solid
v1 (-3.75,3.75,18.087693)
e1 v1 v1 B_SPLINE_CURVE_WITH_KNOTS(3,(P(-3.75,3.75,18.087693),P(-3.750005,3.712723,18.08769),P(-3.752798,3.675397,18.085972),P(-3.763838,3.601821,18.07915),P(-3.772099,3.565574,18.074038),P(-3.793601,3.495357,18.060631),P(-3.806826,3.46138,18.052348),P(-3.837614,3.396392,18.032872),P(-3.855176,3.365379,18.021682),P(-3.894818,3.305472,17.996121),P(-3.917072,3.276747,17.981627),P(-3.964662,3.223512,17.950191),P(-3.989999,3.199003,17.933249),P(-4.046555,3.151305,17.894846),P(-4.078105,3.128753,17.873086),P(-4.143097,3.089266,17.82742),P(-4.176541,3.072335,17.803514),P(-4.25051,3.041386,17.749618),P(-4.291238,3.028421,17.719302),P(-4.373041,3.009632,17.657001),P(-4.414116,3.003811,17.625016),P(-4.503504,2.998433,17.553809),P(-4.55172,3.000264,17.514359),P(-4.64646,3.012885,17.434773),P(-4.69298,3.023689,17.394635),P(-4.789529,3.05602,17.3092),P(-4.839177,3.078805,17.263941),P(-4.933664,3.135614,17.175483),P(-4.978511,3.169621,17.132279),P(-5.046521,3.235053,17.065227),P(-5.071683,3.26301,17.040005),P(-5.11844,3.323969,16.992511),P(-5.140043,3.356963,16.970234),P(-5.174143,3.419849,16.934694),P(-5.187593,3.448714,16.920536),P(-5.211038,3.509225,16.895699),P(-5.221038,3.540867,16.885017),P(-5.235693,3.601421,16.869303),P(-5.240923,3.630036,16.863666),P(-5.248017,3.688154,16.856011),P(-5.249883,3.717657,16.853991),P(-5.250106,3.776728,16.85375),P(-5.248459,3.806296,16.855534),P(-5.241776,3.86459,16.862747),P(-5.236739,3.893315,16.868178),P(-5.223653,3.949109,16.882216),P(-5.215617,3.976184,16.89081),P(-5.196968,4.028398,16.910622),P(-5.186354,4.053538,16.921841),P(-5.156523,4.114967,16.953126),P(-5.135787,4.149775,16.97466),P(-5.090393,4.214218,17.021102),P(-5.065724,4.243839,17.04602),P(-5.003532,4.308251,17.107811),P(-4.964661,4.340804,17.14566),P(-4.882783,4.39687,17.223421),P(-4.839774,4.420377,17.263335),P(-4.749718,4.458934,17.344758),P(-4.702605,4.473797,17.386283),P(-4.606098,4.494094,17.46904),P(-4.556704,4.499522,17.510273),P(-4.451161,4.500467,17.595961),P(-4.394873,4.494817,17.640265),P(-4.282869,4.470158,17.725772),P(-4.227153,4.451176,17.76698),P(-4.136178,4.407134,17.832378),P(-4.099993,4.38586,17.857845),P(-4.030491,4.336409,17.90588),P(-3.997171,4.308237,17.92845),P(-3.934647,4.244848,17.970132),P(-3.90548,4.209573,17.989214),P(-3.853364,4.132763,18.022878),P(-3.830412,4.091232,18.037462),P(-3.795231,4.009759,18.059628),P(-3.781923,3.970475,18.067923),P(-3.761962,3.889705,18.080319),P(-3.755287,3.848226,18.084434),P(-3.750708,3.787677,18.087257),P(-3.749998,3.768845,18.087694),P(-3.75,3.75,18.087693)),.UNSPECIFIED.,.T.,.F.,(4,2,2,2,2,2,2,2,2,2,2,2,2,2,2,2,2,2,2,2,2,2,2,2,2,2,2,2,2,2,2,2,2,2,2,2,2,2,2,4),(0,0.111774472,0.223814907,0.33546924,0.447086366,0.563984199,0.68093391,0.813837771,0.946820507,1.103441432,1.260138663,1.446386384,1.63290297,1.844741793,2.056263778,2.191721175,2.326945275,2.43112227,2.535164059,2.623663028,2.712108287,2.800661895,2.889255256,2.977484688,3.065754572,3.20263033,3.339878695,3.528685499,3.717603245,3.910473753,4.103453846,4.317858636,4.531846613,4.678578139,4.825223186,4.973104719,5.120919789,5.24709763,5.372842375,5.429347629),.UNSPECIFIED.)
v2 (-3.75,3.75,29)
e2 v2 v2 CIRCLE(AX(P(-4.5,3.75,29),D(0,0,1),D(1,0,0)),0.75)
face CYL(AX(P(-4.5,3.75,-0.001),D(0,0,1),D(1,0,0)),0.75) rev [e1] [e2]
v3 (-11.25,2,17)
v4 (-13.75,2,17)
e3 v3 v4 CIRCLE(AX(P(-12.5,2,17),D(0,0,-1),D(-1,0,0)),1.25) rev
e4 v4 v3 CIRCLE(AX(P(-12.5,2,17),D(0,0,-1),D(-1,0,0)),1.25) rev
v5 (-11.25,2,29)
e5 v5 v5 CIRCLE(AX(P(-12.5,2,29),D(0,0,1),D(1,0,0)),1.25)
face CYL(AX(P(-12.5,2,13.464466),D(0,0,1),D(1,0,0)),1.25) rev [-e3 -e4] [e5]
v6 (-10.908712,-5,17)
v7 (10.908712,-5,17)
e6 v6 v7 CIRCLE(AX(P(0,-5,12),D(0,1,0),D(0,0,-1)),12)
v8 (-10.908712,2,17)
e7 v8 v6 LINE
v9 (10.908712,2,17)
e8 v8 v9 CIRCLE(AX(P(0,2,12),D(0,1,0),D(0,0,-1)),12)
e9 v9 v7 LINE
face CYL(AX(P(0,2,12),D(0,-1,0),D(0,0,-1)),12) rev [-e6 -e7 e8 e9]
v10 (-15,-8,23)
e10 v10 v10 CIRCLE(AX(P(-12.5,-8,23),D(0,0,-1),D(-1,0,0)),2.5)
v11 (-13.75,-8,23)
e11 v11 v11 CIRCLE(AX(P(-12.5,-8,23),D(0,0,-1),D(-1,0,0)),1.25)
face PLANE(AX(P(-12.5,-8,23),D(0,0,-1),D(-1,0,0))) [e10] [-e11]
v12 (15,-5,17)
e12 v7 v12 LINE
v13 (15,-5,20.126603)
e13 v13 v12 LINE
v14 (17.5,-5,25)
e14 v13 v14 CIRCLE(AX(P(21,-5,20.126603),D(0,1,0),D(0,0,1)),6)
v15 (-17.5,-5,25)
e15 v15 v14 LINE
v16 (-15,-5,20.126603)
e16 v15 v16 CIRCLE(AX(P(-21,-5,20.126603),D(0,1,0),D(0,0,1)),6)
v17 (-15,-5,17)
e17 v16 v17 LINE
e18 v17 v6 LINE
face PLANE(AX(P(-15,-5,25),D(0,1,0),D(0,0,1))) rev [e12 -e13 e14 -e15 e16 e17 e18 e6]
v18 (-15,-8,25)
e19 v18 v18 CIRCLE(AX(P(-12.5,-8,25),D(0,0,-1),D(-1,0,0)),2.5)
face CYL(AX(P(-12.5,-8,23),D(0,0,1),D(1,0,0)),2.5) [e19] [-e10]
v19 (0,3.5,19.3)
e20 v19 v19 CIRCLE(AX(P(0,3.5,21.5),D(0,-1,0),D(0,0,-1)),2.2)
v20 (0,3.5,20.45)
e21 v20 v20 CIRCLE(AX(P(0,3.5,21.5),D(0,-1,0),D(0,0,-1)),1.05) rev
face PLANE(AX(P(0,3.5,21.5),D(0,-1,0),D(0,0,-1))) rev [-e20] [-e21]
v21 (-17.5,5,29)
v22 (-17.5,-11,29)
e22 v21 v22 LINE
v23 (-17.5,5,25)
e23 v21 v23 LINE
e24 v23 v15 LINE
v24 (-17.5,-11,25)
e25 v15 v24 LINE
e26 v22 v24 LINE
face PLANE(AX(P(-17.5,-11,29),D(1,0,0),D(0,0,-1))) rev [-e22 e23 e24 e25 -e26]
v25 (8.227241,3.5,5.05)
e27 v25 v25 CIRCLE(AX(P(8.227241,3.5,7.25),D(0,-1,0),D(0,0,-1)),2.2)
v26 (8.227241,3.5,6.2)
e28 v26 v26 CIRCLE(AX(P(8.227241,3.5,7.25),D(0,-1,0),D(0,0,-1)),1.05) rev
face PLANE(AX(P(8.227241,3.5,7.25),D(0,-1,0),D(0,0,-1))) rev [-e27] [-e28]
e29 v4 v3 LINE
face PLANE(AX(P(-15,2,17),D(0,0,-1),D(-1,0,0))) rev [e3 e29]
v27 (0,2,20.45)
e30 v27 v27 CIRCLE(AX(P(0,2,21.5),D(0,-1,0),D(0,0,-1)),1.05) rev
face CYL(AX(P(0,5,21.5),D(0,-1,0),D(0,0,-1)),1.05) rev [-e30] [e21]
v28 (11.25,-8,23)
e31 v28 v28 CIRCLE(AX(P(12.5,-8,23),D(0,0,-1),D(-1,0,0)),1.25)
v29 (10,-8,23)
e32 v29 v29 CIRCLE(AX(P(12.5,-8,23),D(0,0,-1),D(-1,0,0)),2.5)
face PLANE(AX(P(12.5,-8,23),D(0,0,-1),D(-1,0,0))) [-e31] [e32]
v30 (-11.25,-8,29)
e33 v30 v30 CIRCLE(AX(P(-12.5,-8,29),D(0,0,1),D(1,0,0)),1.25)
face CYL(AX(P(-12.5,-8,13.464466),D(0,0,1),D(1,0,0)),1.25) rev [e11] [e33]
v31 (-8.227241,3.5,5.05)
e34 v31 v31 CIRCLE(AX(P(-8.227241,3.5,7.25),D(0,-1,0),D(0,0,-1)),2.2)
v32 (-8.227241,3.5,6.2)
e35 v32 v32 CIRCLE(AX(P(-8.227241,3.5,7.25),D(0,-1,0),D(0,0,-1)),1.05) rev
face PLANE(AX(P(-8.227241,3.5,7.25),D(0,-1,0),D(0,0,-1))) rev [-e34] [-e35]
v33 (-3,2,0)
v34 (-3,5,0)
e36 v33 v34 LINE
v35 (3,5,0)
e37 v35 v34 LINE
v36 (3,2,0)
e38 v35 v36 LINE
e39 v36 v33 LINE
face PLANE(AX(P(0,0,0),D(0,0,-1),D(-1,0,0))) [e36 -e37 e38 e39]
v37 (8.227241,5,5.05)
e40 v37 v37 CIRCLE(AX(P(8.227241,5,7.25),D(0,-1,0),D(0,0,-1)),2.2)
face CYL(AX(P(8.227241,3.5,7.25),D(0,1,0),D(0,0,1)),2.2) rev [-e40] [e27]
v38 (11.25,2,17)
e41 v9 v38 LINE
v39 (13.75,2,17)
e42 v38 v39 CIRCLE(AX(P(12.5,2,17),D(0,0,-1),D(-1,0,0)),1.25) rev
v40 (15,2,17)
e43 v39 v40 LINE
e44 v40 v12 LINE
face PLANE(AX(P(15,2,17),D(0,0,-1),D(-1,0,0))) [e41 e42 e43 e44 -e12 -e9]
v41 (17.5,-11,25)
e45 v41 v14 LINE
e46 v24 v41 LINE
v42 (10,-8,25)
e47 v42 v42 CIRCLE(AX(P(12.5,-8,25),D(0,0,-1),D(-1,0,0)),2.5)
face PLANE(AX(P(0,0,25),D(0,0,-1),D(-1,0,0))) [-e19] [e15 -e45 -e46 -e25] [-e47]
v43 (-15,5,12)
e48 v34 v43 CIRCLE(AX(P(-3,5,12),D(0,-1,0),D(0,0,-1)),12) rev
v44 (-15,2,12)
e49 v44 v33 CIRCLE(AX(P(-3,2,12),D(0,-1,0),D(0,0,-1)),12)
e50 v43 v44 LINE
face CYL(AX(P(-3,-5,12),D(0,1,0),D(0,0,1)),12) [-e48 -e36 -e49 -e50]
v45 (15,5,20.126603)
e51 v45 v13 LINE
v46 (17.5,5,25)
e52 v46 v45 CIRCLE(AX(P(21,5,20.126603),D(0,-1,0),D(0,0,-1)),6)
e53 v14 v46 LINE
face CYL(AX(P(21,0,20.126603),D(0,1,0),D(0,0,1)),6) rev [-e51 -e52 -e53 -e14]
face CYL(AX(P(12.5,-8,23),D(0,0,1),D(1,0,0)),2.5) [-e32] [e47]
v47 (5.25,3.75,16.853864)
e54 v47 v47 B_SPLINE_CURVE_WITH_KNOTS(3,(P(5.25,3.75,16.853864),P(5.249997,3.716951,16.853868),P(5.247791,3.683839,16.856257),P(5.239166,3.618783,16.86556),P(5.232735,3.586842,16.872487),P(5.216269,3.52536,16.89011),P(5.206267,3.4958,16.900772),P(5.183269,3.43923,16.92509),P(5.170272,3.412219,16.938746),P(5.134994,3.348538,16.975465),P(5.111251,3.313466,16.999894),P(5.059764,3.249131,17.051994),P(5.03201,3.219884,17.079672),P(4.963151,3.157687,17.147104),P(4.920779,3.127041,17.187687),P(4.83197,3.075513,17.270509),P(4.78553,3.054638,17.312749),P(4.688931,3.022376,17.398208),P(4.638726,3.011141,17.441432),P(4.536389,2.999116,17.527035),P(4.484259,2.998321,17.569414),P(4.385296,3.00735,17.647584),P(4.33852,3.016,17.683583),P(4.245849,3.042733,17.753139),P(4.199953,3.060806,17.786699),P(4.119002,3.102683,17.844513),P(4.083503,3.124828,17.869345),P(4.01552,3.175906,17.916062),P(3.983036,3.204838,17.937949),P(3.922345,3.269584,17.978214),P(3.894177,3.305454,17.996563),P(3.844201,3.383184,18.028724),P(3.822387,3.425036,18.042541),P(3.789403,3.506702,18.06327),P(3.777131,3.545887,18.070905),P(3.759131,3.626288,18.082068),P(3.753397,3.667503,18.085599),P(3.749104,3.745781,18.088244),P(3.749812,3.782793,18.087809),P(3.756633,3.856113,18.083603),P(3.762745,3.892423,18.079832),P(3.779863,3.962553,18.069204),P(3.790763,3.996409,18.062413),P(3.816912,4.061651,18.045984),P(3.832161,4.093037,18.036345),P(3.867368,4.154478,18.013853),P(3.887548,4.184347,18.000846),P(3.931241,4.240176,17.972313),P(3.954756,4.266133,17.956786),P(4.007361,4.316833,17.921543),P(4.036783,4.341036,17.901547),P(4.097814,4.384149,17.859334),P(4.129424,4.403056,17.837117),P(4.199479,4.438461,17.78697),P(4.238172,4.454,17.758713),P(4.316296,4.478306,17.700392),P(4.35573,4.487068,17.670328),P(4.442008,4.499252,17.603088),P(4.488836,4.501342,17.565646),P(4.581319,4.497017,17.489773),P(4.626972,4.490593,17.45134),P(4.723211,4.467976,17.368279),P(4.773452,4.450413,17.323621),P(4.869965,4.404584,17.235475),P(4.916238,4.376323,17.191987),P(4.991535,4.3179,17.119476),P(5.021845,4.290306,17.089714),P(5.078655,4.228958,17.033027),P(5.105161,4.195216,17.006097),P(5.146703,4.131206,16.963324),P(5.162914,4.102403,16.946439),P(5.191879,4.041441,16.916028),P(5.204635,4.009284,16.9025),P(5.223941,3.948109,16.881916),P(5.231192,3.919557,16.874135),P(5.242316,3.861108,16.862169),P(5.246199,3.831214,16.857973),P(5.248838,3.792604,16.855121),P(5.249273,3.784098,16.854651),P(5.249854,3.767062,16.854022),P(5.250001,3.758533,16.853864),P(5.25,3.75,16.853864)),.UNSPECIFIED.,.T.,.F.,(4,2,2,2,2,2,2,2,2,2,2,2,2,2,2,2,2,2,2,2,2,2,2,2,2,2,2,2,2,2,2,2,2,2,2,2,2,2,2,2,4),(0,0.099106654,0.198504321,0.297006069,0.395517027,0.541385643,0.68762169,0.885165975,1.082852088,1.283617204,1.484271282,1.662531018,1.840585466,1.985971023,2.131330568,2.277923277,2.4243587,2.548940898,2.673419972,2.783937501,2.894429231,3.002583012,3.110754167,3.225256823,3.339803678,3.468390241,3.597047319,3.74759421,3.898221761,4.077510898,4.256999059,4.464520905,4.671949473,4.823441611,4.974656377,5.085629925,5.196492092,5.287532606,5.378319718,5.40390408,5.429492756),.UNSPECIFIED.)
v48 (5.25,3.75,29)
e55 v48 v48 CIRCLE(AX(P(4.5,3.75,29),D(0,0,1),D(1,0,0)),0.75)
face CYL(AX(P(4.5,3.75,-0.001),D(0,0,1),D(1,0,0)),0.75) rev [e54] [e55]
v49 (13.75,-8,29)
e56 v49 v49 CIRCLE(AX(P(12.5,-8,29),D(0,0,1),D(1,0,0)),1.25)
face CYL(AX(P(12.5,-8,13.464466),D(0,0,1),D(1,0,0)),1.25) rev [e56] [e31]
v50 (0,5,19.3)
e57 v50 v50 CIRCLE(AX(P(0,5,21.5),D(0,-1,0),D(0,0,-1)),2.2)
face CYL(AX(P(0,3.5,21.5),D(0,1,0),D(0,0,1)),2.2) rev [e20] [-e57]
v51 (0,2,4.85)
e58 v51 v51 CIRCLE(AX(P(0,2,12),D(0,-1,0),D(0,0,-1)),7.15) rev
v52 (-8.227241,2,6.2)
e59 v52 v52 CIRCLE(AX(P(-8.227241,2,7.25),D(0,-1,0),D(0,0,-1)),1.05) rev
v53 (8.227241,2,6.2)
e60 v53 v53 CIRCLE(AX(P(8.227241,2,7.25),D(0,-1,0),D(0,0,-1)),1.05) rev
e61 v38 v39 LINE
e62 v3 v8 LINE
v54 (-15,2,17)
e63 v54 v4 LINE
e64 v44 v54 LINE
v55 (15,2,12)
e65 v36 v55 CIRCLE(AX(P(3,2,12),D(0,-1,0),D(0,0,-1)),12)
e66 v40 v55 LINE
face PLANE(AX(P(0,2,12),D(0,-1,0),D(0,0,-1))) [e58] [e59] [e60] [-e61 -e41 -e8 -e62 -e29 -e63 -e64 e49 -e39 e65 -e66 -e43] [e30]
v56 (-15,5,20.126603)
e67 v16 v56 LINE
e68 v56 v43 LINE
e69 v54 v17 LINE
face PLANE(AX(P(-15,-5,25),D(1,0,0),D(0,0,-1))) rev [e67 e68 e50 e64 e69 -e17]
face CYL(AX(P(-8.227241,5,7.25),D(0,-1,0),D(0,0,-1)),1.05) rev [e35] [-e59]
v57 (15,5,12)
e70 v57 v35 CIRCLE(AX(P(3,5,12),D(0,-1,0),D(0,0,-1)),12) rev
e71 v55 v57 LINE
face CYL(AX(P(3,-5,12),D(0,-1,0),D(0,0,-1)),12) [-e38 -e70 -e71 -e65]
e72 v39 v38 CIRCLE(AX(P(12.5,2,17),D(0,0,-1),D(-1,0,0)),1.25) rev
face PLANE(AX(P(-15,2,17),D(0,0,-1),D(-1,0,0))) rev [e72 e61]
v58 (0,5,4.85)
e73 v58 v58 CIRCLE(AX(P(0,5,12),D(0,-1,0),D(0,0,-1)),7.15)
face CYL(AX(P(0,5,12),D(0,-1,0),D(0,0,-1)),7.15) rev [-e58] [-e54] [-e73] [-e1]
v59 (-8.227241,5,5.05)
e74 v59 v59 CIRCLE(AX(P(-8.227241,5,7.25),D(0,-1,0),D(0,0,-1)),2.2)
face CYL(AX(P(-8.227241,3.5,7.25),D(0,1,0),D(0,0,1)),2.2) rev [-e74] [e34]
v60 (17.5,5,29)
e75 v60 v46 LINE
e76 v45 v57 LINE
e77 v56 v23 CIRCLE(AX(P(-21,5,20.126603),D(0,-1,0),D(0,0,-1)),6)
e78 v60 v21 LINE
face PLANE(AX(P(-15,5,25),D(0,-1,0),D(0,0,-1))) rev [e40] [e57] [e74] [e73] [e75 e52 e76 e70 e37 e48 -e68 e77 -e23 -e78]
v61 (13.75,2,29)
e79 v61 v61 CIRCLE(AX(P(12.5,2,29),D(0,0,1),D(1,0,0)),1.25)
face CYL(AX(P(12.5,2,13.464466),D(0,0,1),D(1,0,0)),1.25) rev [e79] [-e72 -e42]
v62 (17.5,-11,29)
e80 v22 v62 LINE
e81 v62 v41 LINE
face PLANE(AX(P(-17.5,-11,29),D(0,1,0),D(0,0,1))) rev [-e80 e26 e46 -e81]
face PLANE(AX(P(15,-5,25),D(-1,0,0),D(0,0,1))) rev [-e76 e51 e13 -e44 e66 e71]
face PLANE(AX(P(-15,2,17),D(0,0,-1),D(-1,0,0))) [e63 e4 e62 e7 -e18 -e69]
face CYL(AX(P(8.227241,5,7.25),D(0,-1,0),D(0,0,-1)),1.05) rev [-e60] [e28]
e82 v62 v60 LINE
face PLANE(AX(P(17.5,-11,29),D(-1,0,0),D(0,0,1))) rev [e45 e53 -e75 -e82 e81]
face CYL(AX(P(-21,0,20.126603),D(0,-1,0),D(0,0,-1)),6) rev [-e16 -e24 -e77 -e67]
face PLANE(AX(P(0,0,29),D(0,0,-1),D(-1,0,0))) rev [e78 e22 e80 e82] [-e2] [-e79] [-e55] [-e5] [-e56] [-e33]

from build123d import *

# Parameters (mm, degrees)
SKETCH1_W                           = 30
SKETCH1_H                           = 10
MAIN_DEPTH                          = 25
SKETCH5_R                           = 1.05
SKETCH5_R_2                         = 7.15
MAINANDFIXHOLE_DEPTH                = 31.822070015
SKETCH6_R                           = 2.2
CODERFIXHOLE2_DEPTH                 = 1.5
CODERHOLE2_DEPTH                    = 7
SKETCH10_W                          = 35
SKETCH10_H                          = 16
LINK_DEPTH                          = 4
SKETCH8_R                           = 1.25
VERTICALHOLES_DEPTH                 = 12
SKETCH13_R                          = 2.5
LINKREINFORCEMENT_DEPTH             = 2
FILLET4_R                           = 6
FILLET6_R                           = 12
HOLELPATTERN1_COUNT                 = 2
HOLELPATTERN1_PITCH                 = 25
HOLELPATTERN1_COUNT_DIR2            = 2
HOLELPATTERN1_PITCH_DIR2            = 10
HOLETOACCESSENCODERSCREW_REACH      = 37.612
HOLETOACCESSENCODERSCREW_END_RADIUS = 7.15
SKETCH14_R                          = 0.75


with BuildPart() as part:
    # Sketch1 → Main (new body)
    with BuildSketch(Plane.XY):
        Rectangle(SKETCH1_W, SKETCH1_H)
    extrude(amount=MAIN_DEPTH)

    # Sketch5 → MainAndFixHole (cut, through all)
    with BuildSketch(Plane(origin=(0, -5, 0), x_dir=(-1, 0, 0), z_dir=(0, -1, 0))):
        with Locations(Location((0, -21.5, 0), (0, 0, 90))):
            Circle(SKETCH5_R)
        with Locations(Location((-8.227241336, -7.25, 0), (0, 0, 90))):
            Circle(SKETCH5_R)
        with Locations(Location((8.227241336, -7.25, 0), (0, 0, 90))):
            Circle(SKETCH5_R)
        with Locations(Location((0, -12, 0), (0, 0, 90))):
            Circle(SKETCH5_R_2)
    extrude(amount=-MAINANDFIXHOLE_DEPTH, mode=Mode.SUBTRACT)

    # Sketch6 → CoderFixHole2 (cut)
    with BuildSketch(Plane(origin=(0, 5, 0), x_dir=(-1, 0, 0), z_dir=(0, -1, 0))):
        with Locations(Location((0, -21.5, 0), (0, 0, 90))):
            Circle(SKETCH6_R)
        with Locations(Location((-8.227241336, -7.25, 0), (0, 0, 90))):
            Circle(SKETCH6_R)
        with Locations(Location((8.227241336, -7.25, 0), (0, 0, 90))):
            Circle(SKETCH6_R)
    extrude(amount=CODERFIXHOLE2_DEPTH, mode=Mode.SUBTRACT)

    # Sketch11 → CoderHole2 (cut)
    with BuildSketch(Plane(origin=(0, -5, 0), x_dir=(1, 0, 0), z_dir=(0, 1, 0))):
        with BuildLine():
            Line((-15, 0), (15, 0))
            Line((15, 0), (15, -17))
            Line((15, -17), (10.908712115, -17))
            ThreePointArc((10.908712115, -17), (0, -24), (-10.908712115, -17))
            Line((-10.908712115, -17), (-15, -17))
            Line((-15, -17), (-15, 0))
        make_face()
    extrude(amount=CODERHOLE2_DEPTH, mode=Mode.SUBTRACT)

    # Sketch10 → Link (add)
    with BuildSketch(Plane.XY.offset(25)):
        with Locations((0, -3)):
            Rectangle(SKETCH10_W, SKETCH10_H)
    extrude(amount=LINK_DEPTH)

    # Sketch8 → VerticalHoles (cut)
    with BuildSketch(Plane.XY.offset(29)):
        with Locations((12.5, 2)):
            Circle(SKETCH8_R)
    verticalholes = extrude(amount=-VERTICALHOLES_DEPTH, mode=Mode.SUBTRACT)

    # Sketch13 → LinkReinforcement (add)
    with BuildSketch(Plane(origin=(0, 0, 25), x_dir=(-1, 0, 0), z_dir=(0, 0, -1))):
        with Locations((-12.5, -8)):
            Circle(SKETCH13_R)
        with Locations((12.5, -8)):
            Circle(SKETCH13_R)
    extrude(amount=LINKREINFORCEMENT_DEPTH)

    # Fillet4
    # the kernel refuses this fillet: 6 mm, written as the material it adds along each edge
    with BuildSketch(Plane(origin=(15, -5, 25), x_dir=(1, 0, 0), z_dir=(0, 1, 0)), Plane(origin=(-15, 5, 25), x_dir=(-1, 0, 0), z_dir=(0, -1, 0))) as fillet4_piece_1:
        with BuildLine():
            CenterArc((6, 4.873397172), FILLET4_R, 180, 54.314665287)
            Line((0, 4.873397172), (-0.12, 4.873397172))
            Line((-0.12, 4.873397172), (-0.12, 0))
            Line((-0.12, 0), (0, -0.12))
            ThreePointArc((0, -0.12), (1.25, -0.12), (2.43, -0.097467943))
            Line((2.43, -0.097467943), (2.5, 0))
        make_face()
    extrude(amount=10)

    # Fillet6
    fillet6_edges = [part.edges().sort_by_distance(p)[0] for p in [
        (-15, 3.5, 0),
        (15, 3.5, 0),
    ]]
    fillet(fillet6_edges, radius=FILLET6_R)

    # HoleLPattern1: VerticalHoles 2 × 2
    with Locations(*[(-i * HOLELPATTERN1_PITCH, -j * HOLELPATTERN1_PITCH_DIR2, 0) for i in range(HOLELPATTERN1_COUNT) for j in range(HOLELPATTERN1_COUNT_DIR2) if (i, j) != (0, 0)]):
        add(verticalholes, mode=Mode.SUBTRACT)

    # HoleToAccessEncoderScrew: up to this cylinder (the profile starts outside it)
    holetoaccessencoderscrew_end = Plane(origin=(0, 3.75, 12), z_dir=(0, -1, 0)) * Cylinder(HOLETOACCESSENCODERSCREW_END_RADIUS, 90.524, mode=Mode.PRIVATE)
    # Sketch14 → HoleToAccessEncoderScrew (cut, up to the surface)
    with BuildSketch(Plane.XY.offset(29), mode=Mode.PRIVATE) as holetoaccessencoderscrew_sk1:
        with Locations((4.5, 3.75)):
            Circle(SKETCH14_R)
    holetoaccessencoderscrew_tool1 = extrude(holetoaccessencoderscrew_sk1.sketch, amount=-HOLETOACCESSENCODERSCREW_REACH, mode=Mode.PRIVATE) - holetoaccessencoderscrew_end
    add(holetoaccessencoderscrew_tool1.solids().sort_by_distance((4.5, 3.75, 29))[0], mode=Mode.SUBTRACT)
    # Sketch14 → HoleToAccessEncoderScrew (cut, up to the surface)
    with BuildSketch(Plane.XY.offset(29), mode=Mode.PRIVATE) as holetoaccessencoderscrew_sk2:
        with Locations((-4.5, 3.75)):
            Circle(SKETCH14_R)
    holetoaccessencoderscrew_tool2 = extrude(holetoaccessencoderscrew_sk2.sketch, amount=-HOLETOACCESSENCODERSCREW_REACH, mode=Mode.PRIVATE) - holetoaccessencoderscrew_end
    add(holetoaccessencoderscrew_tool2.solids().sort_by_distance((-4.5, 3.75, 29))[0], mode=Mode.SUBTRACT)


solid = part.part
